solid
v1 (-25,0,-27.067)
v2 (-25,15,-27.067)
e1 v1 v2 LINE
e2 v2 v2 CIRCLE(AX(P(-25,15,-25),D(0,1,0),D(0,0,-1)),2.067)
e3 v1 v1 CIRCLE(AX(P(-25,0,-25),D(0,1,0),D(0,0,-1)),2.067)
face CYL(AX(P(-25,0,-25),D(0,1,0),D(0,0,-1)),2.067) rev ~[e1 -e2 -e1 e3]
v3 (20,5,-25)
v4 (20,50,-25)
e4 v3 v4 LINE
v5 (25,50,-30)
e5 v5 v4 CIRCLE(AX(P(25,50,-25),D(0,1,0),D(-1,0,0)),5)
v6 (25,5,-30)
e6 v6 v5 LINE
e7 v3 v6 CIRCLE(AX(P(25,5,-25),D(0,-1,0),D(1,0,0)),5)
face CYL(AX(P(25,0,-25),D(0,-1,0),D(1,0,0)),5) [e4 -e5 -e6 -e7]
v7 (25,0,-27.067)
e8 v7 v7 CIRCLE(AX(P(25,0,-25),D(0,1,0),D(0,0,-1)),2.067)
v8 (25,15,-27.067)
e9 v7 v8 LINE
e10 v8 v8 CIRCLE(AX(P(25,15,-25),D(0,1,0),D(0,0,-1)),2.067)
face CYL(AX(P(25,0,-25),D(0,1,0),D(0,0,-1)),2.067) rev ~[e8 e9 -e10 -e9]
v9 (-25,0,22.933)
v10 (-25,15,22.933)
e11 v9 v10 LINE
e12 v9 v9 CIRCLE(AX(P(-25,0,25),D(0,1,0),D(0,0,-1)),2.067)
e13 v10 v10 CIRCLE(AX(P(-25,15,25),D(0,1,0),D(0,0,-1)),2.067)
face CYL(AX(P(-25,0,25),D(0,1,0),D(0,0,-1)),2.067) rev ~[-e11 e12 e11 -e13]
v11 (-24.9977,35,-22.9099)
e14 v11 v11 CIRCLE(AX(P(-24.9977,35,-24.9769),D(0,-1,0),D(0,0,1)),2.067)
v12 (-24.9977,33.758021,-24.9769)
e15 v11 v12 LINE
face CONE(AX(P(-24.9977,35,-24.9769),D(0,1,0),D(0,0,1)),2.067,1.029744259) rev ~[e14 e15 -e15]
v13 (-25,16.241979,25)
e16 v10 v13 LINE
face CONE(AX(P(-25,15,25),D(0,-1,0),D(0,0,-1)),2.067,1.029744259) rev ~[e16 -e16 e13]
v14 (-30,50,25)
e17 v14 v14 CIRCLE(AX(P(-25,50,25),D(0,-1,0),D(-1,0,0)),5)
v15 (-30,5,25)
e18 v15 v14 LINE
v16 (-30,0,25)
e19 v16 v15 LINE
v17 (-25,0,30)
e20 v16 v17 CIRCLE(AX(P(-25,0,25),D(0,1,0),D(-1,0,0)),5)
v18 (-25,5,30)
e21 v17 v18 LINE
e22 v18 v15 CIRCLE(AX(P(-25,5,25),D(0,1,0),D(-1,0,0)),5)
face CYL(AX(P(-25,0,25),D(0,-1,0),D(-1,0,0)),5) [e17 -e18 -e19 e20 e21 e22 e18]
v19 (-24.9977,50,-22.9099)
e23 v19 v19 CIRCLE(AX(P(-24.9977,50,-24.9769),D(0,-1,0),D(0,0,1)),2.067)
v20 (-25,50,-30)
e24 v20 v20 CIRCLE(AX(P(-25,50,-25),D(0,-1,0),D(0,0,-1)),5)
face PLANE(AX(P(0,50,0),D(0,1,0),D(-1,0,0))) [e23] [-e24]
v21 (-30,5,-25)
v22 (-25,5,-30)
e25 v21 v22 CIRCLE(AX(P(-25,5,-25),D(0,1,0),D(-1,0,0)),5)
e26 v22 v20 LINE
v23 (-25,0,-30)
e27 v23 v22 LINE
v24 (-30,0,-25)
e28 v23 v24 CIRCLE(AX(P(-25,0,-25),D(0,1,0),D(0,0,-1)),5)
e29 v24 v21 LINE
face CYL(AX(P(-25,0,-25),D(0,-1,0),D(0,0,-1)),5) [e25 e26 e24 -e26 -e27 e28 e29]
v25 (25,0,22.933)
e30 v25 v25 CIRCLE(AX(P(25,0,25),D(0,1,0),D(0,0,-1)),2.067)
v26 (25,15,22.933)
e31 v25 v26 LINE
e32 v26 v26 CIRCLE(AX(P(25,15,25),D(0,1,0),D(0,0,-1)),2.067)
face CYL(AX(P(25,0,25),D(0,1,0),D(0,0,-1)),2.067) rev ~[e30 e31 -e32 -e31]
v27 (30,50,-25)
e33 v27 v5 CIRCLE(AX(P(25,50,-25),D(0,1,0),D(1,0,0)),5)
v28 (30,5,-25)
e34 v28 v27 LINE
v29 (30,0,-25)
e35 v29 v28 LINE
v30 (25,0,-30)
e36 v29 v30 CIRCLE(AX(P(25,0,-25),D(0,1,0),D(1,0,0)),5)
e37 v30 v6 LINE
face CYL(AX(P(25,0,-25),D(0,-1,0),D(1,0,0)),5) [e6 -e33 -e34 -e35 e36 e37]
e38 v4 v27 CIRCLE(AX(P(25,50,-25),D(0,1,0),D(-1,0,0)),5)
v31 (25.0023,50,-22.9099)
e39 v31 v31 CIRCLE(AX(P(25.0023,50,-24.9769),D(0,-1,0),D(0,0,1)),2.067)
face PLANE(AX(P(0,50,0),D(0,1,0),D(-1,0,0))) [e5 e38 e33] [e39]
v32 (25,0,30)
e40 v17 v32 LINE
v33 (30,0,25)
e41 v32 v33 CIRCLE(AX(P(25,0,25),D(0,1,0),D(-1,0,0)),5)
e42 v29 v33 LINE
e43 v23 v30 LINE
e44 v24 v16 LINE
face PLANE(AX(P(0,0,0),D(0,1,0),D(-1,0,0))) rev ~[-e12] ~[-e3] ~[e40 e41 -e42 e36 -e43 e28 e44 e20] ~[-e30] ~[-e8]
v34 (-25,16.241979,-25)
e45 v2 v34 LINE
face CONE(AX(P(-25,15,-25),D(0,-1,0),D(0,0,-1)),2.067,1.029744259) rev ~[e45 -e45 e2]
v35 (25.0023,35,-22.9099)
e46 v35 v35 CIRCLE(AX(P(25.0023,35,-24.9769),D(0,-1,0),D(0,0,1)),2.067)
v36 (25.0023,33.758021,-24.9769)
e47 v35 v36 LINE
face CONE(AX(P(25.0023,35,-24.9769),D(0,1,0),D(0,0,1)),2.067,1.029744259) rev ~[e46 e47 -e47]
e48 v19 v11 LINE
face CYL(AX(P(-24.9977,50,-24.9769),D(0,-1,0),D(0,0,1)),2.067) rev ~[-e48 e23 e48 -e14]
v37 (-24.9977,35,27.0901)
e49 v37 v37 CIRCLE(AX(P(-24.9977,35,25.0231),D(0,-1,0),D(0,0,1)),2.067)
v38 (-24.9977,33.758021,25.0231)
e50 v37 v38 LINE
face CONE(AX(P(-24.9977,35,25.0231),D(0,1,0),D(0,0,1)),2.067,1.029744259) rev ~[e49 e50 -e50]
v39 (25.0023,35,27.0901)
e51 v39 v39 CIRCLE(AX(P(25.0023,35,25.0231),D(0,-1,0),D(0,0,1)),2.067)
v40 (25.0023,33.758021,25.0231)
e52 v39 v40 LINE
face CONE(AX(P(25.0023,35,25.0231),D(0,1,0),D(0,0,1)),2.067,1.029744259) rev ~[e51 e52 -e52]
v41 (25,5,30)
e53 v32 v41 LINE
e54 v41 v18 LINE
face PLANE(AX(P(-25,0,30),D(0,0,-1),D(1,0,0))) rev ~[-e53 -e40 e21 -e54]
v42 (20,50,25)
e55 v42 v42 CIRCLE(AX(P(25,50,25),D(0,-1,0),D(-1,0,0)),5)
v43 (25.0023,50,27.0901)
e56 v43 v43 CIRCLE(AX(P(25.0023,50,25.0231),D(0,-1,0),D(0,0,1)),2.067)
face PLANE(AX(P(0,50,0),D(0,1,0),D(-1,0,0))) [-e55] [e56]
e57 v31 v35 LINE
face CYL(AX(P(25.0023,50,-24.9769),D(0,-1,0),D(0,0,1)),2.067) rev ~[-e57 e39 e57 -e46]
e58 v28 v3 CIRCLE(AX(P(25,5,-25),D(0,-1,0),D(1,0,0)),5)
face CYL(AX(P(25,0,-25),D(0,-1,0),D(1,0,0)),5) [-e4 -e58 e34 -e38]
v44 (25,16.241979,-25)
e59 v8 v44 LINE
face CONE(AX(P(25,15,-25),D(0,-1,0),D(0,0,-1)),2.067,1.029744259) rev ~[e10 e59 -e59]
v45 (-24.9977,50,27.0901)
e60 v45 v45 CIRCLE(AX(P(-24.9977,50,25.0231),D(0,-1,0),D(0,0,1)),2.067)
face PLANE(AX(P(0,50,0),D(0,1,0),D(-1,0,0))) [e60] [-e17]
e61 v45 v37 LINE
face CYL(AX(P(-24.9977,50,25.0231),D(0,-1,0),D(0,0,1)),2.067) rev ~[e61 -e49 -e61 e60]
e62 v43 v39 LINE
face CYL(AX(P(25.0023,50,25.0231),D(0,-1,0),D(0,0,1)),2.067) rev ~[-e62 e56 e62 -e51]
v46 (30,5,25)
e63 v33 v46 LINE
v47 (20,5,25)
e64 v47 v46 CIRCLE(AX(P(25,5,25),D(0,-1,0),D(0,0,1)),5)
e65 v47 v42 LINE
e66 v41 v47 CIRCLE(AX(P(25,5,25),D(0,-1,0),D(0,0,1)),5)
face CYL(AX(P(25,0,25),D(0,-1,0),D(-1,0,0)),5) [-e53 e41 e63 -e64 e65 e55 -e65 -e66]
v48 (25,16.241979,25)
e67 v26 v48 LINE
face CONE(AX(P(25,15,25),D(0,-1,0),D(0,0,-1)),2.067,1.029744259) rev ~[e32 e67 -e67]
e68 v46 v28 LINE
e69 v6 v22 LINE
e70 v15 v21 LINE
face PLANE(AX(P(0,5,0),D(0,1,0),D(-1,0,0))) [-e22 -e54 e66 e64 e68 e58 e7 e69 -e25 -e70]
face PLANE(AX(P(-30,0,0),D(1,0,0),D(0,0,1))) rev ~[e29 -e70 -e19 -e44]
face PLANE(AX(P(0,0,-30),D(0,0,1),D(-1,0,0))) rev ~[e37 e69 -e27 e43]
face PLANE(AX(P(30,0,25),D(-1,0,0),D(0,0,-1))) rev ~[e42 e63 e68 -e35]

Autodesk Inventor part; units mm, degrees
ref_plane "YZ Plane" through (0, 0, 0) normal (1, 0, 0) x (0, 1, 0)
ref_plane "XZ Plane" through (0, 0, 0) normal (0, 1, 0) x (-1, 0, 0)
ref_plane "XY Plane" through (0, 0, 0) normal (0, 0, 1) x (1, 0, 0)
sketch "Эскиз1" plane through (0, 0, 0) normal (0, 1, 0) x (-1, 0, 0)
  line L0 (25, 30) -> (-25, 30)
  line L1 (-30, 25) -> (-30, -25)
  line L2 (-25, -30) -> (25, -30)
  line L3 (30, -25) -> (30, 25)
  line L4 (0, -43.4497) -> (0, 43.4497) projected
  line L5 (-43.4497, 0) -> (43.4497, 0) projected
  arc A0 (30, 25) -> (25, 30) centre (25, 25) ccw
  arc A1 (25, -30) -> (30, -25) centre (25, -25) ccw
  arc A2 (-30, -25) -> (-25, -30) centre (-25, -25) ccw
  arc A3 (-25, 30) -> (-30, 25) centre (-25, 25) ccw
  circle A4 centre (25, 25) radius 5
  circle A5 centre (25, -25) radius 5
  circle A6 centre (-25, 25) radius 5
  circle A7 centre (-25, -25) radius 5
  point P0 (0, 0)
  dimension "d0" = 5
  dimension "d1" = 25
  dimension "d2" = 25
extrude "Выдавливание1" add sketch "Эскиз1" along normal blind 5 contours A4 L3 L5 L4 L0 | L4 L5 L1 A6 L0 | L5 L3 A5 L2 L4 | L4 L2 A7 L1 L5
extrude "Выдавливание2" add sketch "Эскиз1" along normal blind 50 contours A0 A4 | A6 A3 | A1 A5 | A2 A7
hole "Отверстие1" at (25, 0, 25) at (-25, 0, 25) at (25, 0, -25) at (-25, 0, -25) direction (0, 1, 0) diameter 4.134 depth 15 tip angle 118 thread size "M5x0.8" class "6H" standard "ISO Metric profile"
sketch "Эскиз2" plane through (-25, 50, 25) normal (0, 1, 0) x (1, 0, 0)
  line L0 (-17, 25) -> (67, 25) projected
  line L1 (25, 67) -> (25, -17) projected
  point P0 (25, 25)
  point P1 (0.0023, -0.0231)
  point P2 (50.0023, -0.0231)
  point P3 (0.0023, 49.9769)
  point P4 (50.0023, 49.9769)
  dimension "d30" = 50
  dimension "d33" = 50
hole "Отверстие3" at (-24.9977, 50, 25.0231) at (-24.9977, 50, -24.9769) at (25.0023, 50, -24.9769) at (25.0023, 50, 25.0231) direction (0, -1, 0) diameter 4.134 depth 15 tip angle 118 thread size "M5x0.8" class "6H" standard "ISO Metric profile"
properties part number "стойка для лотка"
